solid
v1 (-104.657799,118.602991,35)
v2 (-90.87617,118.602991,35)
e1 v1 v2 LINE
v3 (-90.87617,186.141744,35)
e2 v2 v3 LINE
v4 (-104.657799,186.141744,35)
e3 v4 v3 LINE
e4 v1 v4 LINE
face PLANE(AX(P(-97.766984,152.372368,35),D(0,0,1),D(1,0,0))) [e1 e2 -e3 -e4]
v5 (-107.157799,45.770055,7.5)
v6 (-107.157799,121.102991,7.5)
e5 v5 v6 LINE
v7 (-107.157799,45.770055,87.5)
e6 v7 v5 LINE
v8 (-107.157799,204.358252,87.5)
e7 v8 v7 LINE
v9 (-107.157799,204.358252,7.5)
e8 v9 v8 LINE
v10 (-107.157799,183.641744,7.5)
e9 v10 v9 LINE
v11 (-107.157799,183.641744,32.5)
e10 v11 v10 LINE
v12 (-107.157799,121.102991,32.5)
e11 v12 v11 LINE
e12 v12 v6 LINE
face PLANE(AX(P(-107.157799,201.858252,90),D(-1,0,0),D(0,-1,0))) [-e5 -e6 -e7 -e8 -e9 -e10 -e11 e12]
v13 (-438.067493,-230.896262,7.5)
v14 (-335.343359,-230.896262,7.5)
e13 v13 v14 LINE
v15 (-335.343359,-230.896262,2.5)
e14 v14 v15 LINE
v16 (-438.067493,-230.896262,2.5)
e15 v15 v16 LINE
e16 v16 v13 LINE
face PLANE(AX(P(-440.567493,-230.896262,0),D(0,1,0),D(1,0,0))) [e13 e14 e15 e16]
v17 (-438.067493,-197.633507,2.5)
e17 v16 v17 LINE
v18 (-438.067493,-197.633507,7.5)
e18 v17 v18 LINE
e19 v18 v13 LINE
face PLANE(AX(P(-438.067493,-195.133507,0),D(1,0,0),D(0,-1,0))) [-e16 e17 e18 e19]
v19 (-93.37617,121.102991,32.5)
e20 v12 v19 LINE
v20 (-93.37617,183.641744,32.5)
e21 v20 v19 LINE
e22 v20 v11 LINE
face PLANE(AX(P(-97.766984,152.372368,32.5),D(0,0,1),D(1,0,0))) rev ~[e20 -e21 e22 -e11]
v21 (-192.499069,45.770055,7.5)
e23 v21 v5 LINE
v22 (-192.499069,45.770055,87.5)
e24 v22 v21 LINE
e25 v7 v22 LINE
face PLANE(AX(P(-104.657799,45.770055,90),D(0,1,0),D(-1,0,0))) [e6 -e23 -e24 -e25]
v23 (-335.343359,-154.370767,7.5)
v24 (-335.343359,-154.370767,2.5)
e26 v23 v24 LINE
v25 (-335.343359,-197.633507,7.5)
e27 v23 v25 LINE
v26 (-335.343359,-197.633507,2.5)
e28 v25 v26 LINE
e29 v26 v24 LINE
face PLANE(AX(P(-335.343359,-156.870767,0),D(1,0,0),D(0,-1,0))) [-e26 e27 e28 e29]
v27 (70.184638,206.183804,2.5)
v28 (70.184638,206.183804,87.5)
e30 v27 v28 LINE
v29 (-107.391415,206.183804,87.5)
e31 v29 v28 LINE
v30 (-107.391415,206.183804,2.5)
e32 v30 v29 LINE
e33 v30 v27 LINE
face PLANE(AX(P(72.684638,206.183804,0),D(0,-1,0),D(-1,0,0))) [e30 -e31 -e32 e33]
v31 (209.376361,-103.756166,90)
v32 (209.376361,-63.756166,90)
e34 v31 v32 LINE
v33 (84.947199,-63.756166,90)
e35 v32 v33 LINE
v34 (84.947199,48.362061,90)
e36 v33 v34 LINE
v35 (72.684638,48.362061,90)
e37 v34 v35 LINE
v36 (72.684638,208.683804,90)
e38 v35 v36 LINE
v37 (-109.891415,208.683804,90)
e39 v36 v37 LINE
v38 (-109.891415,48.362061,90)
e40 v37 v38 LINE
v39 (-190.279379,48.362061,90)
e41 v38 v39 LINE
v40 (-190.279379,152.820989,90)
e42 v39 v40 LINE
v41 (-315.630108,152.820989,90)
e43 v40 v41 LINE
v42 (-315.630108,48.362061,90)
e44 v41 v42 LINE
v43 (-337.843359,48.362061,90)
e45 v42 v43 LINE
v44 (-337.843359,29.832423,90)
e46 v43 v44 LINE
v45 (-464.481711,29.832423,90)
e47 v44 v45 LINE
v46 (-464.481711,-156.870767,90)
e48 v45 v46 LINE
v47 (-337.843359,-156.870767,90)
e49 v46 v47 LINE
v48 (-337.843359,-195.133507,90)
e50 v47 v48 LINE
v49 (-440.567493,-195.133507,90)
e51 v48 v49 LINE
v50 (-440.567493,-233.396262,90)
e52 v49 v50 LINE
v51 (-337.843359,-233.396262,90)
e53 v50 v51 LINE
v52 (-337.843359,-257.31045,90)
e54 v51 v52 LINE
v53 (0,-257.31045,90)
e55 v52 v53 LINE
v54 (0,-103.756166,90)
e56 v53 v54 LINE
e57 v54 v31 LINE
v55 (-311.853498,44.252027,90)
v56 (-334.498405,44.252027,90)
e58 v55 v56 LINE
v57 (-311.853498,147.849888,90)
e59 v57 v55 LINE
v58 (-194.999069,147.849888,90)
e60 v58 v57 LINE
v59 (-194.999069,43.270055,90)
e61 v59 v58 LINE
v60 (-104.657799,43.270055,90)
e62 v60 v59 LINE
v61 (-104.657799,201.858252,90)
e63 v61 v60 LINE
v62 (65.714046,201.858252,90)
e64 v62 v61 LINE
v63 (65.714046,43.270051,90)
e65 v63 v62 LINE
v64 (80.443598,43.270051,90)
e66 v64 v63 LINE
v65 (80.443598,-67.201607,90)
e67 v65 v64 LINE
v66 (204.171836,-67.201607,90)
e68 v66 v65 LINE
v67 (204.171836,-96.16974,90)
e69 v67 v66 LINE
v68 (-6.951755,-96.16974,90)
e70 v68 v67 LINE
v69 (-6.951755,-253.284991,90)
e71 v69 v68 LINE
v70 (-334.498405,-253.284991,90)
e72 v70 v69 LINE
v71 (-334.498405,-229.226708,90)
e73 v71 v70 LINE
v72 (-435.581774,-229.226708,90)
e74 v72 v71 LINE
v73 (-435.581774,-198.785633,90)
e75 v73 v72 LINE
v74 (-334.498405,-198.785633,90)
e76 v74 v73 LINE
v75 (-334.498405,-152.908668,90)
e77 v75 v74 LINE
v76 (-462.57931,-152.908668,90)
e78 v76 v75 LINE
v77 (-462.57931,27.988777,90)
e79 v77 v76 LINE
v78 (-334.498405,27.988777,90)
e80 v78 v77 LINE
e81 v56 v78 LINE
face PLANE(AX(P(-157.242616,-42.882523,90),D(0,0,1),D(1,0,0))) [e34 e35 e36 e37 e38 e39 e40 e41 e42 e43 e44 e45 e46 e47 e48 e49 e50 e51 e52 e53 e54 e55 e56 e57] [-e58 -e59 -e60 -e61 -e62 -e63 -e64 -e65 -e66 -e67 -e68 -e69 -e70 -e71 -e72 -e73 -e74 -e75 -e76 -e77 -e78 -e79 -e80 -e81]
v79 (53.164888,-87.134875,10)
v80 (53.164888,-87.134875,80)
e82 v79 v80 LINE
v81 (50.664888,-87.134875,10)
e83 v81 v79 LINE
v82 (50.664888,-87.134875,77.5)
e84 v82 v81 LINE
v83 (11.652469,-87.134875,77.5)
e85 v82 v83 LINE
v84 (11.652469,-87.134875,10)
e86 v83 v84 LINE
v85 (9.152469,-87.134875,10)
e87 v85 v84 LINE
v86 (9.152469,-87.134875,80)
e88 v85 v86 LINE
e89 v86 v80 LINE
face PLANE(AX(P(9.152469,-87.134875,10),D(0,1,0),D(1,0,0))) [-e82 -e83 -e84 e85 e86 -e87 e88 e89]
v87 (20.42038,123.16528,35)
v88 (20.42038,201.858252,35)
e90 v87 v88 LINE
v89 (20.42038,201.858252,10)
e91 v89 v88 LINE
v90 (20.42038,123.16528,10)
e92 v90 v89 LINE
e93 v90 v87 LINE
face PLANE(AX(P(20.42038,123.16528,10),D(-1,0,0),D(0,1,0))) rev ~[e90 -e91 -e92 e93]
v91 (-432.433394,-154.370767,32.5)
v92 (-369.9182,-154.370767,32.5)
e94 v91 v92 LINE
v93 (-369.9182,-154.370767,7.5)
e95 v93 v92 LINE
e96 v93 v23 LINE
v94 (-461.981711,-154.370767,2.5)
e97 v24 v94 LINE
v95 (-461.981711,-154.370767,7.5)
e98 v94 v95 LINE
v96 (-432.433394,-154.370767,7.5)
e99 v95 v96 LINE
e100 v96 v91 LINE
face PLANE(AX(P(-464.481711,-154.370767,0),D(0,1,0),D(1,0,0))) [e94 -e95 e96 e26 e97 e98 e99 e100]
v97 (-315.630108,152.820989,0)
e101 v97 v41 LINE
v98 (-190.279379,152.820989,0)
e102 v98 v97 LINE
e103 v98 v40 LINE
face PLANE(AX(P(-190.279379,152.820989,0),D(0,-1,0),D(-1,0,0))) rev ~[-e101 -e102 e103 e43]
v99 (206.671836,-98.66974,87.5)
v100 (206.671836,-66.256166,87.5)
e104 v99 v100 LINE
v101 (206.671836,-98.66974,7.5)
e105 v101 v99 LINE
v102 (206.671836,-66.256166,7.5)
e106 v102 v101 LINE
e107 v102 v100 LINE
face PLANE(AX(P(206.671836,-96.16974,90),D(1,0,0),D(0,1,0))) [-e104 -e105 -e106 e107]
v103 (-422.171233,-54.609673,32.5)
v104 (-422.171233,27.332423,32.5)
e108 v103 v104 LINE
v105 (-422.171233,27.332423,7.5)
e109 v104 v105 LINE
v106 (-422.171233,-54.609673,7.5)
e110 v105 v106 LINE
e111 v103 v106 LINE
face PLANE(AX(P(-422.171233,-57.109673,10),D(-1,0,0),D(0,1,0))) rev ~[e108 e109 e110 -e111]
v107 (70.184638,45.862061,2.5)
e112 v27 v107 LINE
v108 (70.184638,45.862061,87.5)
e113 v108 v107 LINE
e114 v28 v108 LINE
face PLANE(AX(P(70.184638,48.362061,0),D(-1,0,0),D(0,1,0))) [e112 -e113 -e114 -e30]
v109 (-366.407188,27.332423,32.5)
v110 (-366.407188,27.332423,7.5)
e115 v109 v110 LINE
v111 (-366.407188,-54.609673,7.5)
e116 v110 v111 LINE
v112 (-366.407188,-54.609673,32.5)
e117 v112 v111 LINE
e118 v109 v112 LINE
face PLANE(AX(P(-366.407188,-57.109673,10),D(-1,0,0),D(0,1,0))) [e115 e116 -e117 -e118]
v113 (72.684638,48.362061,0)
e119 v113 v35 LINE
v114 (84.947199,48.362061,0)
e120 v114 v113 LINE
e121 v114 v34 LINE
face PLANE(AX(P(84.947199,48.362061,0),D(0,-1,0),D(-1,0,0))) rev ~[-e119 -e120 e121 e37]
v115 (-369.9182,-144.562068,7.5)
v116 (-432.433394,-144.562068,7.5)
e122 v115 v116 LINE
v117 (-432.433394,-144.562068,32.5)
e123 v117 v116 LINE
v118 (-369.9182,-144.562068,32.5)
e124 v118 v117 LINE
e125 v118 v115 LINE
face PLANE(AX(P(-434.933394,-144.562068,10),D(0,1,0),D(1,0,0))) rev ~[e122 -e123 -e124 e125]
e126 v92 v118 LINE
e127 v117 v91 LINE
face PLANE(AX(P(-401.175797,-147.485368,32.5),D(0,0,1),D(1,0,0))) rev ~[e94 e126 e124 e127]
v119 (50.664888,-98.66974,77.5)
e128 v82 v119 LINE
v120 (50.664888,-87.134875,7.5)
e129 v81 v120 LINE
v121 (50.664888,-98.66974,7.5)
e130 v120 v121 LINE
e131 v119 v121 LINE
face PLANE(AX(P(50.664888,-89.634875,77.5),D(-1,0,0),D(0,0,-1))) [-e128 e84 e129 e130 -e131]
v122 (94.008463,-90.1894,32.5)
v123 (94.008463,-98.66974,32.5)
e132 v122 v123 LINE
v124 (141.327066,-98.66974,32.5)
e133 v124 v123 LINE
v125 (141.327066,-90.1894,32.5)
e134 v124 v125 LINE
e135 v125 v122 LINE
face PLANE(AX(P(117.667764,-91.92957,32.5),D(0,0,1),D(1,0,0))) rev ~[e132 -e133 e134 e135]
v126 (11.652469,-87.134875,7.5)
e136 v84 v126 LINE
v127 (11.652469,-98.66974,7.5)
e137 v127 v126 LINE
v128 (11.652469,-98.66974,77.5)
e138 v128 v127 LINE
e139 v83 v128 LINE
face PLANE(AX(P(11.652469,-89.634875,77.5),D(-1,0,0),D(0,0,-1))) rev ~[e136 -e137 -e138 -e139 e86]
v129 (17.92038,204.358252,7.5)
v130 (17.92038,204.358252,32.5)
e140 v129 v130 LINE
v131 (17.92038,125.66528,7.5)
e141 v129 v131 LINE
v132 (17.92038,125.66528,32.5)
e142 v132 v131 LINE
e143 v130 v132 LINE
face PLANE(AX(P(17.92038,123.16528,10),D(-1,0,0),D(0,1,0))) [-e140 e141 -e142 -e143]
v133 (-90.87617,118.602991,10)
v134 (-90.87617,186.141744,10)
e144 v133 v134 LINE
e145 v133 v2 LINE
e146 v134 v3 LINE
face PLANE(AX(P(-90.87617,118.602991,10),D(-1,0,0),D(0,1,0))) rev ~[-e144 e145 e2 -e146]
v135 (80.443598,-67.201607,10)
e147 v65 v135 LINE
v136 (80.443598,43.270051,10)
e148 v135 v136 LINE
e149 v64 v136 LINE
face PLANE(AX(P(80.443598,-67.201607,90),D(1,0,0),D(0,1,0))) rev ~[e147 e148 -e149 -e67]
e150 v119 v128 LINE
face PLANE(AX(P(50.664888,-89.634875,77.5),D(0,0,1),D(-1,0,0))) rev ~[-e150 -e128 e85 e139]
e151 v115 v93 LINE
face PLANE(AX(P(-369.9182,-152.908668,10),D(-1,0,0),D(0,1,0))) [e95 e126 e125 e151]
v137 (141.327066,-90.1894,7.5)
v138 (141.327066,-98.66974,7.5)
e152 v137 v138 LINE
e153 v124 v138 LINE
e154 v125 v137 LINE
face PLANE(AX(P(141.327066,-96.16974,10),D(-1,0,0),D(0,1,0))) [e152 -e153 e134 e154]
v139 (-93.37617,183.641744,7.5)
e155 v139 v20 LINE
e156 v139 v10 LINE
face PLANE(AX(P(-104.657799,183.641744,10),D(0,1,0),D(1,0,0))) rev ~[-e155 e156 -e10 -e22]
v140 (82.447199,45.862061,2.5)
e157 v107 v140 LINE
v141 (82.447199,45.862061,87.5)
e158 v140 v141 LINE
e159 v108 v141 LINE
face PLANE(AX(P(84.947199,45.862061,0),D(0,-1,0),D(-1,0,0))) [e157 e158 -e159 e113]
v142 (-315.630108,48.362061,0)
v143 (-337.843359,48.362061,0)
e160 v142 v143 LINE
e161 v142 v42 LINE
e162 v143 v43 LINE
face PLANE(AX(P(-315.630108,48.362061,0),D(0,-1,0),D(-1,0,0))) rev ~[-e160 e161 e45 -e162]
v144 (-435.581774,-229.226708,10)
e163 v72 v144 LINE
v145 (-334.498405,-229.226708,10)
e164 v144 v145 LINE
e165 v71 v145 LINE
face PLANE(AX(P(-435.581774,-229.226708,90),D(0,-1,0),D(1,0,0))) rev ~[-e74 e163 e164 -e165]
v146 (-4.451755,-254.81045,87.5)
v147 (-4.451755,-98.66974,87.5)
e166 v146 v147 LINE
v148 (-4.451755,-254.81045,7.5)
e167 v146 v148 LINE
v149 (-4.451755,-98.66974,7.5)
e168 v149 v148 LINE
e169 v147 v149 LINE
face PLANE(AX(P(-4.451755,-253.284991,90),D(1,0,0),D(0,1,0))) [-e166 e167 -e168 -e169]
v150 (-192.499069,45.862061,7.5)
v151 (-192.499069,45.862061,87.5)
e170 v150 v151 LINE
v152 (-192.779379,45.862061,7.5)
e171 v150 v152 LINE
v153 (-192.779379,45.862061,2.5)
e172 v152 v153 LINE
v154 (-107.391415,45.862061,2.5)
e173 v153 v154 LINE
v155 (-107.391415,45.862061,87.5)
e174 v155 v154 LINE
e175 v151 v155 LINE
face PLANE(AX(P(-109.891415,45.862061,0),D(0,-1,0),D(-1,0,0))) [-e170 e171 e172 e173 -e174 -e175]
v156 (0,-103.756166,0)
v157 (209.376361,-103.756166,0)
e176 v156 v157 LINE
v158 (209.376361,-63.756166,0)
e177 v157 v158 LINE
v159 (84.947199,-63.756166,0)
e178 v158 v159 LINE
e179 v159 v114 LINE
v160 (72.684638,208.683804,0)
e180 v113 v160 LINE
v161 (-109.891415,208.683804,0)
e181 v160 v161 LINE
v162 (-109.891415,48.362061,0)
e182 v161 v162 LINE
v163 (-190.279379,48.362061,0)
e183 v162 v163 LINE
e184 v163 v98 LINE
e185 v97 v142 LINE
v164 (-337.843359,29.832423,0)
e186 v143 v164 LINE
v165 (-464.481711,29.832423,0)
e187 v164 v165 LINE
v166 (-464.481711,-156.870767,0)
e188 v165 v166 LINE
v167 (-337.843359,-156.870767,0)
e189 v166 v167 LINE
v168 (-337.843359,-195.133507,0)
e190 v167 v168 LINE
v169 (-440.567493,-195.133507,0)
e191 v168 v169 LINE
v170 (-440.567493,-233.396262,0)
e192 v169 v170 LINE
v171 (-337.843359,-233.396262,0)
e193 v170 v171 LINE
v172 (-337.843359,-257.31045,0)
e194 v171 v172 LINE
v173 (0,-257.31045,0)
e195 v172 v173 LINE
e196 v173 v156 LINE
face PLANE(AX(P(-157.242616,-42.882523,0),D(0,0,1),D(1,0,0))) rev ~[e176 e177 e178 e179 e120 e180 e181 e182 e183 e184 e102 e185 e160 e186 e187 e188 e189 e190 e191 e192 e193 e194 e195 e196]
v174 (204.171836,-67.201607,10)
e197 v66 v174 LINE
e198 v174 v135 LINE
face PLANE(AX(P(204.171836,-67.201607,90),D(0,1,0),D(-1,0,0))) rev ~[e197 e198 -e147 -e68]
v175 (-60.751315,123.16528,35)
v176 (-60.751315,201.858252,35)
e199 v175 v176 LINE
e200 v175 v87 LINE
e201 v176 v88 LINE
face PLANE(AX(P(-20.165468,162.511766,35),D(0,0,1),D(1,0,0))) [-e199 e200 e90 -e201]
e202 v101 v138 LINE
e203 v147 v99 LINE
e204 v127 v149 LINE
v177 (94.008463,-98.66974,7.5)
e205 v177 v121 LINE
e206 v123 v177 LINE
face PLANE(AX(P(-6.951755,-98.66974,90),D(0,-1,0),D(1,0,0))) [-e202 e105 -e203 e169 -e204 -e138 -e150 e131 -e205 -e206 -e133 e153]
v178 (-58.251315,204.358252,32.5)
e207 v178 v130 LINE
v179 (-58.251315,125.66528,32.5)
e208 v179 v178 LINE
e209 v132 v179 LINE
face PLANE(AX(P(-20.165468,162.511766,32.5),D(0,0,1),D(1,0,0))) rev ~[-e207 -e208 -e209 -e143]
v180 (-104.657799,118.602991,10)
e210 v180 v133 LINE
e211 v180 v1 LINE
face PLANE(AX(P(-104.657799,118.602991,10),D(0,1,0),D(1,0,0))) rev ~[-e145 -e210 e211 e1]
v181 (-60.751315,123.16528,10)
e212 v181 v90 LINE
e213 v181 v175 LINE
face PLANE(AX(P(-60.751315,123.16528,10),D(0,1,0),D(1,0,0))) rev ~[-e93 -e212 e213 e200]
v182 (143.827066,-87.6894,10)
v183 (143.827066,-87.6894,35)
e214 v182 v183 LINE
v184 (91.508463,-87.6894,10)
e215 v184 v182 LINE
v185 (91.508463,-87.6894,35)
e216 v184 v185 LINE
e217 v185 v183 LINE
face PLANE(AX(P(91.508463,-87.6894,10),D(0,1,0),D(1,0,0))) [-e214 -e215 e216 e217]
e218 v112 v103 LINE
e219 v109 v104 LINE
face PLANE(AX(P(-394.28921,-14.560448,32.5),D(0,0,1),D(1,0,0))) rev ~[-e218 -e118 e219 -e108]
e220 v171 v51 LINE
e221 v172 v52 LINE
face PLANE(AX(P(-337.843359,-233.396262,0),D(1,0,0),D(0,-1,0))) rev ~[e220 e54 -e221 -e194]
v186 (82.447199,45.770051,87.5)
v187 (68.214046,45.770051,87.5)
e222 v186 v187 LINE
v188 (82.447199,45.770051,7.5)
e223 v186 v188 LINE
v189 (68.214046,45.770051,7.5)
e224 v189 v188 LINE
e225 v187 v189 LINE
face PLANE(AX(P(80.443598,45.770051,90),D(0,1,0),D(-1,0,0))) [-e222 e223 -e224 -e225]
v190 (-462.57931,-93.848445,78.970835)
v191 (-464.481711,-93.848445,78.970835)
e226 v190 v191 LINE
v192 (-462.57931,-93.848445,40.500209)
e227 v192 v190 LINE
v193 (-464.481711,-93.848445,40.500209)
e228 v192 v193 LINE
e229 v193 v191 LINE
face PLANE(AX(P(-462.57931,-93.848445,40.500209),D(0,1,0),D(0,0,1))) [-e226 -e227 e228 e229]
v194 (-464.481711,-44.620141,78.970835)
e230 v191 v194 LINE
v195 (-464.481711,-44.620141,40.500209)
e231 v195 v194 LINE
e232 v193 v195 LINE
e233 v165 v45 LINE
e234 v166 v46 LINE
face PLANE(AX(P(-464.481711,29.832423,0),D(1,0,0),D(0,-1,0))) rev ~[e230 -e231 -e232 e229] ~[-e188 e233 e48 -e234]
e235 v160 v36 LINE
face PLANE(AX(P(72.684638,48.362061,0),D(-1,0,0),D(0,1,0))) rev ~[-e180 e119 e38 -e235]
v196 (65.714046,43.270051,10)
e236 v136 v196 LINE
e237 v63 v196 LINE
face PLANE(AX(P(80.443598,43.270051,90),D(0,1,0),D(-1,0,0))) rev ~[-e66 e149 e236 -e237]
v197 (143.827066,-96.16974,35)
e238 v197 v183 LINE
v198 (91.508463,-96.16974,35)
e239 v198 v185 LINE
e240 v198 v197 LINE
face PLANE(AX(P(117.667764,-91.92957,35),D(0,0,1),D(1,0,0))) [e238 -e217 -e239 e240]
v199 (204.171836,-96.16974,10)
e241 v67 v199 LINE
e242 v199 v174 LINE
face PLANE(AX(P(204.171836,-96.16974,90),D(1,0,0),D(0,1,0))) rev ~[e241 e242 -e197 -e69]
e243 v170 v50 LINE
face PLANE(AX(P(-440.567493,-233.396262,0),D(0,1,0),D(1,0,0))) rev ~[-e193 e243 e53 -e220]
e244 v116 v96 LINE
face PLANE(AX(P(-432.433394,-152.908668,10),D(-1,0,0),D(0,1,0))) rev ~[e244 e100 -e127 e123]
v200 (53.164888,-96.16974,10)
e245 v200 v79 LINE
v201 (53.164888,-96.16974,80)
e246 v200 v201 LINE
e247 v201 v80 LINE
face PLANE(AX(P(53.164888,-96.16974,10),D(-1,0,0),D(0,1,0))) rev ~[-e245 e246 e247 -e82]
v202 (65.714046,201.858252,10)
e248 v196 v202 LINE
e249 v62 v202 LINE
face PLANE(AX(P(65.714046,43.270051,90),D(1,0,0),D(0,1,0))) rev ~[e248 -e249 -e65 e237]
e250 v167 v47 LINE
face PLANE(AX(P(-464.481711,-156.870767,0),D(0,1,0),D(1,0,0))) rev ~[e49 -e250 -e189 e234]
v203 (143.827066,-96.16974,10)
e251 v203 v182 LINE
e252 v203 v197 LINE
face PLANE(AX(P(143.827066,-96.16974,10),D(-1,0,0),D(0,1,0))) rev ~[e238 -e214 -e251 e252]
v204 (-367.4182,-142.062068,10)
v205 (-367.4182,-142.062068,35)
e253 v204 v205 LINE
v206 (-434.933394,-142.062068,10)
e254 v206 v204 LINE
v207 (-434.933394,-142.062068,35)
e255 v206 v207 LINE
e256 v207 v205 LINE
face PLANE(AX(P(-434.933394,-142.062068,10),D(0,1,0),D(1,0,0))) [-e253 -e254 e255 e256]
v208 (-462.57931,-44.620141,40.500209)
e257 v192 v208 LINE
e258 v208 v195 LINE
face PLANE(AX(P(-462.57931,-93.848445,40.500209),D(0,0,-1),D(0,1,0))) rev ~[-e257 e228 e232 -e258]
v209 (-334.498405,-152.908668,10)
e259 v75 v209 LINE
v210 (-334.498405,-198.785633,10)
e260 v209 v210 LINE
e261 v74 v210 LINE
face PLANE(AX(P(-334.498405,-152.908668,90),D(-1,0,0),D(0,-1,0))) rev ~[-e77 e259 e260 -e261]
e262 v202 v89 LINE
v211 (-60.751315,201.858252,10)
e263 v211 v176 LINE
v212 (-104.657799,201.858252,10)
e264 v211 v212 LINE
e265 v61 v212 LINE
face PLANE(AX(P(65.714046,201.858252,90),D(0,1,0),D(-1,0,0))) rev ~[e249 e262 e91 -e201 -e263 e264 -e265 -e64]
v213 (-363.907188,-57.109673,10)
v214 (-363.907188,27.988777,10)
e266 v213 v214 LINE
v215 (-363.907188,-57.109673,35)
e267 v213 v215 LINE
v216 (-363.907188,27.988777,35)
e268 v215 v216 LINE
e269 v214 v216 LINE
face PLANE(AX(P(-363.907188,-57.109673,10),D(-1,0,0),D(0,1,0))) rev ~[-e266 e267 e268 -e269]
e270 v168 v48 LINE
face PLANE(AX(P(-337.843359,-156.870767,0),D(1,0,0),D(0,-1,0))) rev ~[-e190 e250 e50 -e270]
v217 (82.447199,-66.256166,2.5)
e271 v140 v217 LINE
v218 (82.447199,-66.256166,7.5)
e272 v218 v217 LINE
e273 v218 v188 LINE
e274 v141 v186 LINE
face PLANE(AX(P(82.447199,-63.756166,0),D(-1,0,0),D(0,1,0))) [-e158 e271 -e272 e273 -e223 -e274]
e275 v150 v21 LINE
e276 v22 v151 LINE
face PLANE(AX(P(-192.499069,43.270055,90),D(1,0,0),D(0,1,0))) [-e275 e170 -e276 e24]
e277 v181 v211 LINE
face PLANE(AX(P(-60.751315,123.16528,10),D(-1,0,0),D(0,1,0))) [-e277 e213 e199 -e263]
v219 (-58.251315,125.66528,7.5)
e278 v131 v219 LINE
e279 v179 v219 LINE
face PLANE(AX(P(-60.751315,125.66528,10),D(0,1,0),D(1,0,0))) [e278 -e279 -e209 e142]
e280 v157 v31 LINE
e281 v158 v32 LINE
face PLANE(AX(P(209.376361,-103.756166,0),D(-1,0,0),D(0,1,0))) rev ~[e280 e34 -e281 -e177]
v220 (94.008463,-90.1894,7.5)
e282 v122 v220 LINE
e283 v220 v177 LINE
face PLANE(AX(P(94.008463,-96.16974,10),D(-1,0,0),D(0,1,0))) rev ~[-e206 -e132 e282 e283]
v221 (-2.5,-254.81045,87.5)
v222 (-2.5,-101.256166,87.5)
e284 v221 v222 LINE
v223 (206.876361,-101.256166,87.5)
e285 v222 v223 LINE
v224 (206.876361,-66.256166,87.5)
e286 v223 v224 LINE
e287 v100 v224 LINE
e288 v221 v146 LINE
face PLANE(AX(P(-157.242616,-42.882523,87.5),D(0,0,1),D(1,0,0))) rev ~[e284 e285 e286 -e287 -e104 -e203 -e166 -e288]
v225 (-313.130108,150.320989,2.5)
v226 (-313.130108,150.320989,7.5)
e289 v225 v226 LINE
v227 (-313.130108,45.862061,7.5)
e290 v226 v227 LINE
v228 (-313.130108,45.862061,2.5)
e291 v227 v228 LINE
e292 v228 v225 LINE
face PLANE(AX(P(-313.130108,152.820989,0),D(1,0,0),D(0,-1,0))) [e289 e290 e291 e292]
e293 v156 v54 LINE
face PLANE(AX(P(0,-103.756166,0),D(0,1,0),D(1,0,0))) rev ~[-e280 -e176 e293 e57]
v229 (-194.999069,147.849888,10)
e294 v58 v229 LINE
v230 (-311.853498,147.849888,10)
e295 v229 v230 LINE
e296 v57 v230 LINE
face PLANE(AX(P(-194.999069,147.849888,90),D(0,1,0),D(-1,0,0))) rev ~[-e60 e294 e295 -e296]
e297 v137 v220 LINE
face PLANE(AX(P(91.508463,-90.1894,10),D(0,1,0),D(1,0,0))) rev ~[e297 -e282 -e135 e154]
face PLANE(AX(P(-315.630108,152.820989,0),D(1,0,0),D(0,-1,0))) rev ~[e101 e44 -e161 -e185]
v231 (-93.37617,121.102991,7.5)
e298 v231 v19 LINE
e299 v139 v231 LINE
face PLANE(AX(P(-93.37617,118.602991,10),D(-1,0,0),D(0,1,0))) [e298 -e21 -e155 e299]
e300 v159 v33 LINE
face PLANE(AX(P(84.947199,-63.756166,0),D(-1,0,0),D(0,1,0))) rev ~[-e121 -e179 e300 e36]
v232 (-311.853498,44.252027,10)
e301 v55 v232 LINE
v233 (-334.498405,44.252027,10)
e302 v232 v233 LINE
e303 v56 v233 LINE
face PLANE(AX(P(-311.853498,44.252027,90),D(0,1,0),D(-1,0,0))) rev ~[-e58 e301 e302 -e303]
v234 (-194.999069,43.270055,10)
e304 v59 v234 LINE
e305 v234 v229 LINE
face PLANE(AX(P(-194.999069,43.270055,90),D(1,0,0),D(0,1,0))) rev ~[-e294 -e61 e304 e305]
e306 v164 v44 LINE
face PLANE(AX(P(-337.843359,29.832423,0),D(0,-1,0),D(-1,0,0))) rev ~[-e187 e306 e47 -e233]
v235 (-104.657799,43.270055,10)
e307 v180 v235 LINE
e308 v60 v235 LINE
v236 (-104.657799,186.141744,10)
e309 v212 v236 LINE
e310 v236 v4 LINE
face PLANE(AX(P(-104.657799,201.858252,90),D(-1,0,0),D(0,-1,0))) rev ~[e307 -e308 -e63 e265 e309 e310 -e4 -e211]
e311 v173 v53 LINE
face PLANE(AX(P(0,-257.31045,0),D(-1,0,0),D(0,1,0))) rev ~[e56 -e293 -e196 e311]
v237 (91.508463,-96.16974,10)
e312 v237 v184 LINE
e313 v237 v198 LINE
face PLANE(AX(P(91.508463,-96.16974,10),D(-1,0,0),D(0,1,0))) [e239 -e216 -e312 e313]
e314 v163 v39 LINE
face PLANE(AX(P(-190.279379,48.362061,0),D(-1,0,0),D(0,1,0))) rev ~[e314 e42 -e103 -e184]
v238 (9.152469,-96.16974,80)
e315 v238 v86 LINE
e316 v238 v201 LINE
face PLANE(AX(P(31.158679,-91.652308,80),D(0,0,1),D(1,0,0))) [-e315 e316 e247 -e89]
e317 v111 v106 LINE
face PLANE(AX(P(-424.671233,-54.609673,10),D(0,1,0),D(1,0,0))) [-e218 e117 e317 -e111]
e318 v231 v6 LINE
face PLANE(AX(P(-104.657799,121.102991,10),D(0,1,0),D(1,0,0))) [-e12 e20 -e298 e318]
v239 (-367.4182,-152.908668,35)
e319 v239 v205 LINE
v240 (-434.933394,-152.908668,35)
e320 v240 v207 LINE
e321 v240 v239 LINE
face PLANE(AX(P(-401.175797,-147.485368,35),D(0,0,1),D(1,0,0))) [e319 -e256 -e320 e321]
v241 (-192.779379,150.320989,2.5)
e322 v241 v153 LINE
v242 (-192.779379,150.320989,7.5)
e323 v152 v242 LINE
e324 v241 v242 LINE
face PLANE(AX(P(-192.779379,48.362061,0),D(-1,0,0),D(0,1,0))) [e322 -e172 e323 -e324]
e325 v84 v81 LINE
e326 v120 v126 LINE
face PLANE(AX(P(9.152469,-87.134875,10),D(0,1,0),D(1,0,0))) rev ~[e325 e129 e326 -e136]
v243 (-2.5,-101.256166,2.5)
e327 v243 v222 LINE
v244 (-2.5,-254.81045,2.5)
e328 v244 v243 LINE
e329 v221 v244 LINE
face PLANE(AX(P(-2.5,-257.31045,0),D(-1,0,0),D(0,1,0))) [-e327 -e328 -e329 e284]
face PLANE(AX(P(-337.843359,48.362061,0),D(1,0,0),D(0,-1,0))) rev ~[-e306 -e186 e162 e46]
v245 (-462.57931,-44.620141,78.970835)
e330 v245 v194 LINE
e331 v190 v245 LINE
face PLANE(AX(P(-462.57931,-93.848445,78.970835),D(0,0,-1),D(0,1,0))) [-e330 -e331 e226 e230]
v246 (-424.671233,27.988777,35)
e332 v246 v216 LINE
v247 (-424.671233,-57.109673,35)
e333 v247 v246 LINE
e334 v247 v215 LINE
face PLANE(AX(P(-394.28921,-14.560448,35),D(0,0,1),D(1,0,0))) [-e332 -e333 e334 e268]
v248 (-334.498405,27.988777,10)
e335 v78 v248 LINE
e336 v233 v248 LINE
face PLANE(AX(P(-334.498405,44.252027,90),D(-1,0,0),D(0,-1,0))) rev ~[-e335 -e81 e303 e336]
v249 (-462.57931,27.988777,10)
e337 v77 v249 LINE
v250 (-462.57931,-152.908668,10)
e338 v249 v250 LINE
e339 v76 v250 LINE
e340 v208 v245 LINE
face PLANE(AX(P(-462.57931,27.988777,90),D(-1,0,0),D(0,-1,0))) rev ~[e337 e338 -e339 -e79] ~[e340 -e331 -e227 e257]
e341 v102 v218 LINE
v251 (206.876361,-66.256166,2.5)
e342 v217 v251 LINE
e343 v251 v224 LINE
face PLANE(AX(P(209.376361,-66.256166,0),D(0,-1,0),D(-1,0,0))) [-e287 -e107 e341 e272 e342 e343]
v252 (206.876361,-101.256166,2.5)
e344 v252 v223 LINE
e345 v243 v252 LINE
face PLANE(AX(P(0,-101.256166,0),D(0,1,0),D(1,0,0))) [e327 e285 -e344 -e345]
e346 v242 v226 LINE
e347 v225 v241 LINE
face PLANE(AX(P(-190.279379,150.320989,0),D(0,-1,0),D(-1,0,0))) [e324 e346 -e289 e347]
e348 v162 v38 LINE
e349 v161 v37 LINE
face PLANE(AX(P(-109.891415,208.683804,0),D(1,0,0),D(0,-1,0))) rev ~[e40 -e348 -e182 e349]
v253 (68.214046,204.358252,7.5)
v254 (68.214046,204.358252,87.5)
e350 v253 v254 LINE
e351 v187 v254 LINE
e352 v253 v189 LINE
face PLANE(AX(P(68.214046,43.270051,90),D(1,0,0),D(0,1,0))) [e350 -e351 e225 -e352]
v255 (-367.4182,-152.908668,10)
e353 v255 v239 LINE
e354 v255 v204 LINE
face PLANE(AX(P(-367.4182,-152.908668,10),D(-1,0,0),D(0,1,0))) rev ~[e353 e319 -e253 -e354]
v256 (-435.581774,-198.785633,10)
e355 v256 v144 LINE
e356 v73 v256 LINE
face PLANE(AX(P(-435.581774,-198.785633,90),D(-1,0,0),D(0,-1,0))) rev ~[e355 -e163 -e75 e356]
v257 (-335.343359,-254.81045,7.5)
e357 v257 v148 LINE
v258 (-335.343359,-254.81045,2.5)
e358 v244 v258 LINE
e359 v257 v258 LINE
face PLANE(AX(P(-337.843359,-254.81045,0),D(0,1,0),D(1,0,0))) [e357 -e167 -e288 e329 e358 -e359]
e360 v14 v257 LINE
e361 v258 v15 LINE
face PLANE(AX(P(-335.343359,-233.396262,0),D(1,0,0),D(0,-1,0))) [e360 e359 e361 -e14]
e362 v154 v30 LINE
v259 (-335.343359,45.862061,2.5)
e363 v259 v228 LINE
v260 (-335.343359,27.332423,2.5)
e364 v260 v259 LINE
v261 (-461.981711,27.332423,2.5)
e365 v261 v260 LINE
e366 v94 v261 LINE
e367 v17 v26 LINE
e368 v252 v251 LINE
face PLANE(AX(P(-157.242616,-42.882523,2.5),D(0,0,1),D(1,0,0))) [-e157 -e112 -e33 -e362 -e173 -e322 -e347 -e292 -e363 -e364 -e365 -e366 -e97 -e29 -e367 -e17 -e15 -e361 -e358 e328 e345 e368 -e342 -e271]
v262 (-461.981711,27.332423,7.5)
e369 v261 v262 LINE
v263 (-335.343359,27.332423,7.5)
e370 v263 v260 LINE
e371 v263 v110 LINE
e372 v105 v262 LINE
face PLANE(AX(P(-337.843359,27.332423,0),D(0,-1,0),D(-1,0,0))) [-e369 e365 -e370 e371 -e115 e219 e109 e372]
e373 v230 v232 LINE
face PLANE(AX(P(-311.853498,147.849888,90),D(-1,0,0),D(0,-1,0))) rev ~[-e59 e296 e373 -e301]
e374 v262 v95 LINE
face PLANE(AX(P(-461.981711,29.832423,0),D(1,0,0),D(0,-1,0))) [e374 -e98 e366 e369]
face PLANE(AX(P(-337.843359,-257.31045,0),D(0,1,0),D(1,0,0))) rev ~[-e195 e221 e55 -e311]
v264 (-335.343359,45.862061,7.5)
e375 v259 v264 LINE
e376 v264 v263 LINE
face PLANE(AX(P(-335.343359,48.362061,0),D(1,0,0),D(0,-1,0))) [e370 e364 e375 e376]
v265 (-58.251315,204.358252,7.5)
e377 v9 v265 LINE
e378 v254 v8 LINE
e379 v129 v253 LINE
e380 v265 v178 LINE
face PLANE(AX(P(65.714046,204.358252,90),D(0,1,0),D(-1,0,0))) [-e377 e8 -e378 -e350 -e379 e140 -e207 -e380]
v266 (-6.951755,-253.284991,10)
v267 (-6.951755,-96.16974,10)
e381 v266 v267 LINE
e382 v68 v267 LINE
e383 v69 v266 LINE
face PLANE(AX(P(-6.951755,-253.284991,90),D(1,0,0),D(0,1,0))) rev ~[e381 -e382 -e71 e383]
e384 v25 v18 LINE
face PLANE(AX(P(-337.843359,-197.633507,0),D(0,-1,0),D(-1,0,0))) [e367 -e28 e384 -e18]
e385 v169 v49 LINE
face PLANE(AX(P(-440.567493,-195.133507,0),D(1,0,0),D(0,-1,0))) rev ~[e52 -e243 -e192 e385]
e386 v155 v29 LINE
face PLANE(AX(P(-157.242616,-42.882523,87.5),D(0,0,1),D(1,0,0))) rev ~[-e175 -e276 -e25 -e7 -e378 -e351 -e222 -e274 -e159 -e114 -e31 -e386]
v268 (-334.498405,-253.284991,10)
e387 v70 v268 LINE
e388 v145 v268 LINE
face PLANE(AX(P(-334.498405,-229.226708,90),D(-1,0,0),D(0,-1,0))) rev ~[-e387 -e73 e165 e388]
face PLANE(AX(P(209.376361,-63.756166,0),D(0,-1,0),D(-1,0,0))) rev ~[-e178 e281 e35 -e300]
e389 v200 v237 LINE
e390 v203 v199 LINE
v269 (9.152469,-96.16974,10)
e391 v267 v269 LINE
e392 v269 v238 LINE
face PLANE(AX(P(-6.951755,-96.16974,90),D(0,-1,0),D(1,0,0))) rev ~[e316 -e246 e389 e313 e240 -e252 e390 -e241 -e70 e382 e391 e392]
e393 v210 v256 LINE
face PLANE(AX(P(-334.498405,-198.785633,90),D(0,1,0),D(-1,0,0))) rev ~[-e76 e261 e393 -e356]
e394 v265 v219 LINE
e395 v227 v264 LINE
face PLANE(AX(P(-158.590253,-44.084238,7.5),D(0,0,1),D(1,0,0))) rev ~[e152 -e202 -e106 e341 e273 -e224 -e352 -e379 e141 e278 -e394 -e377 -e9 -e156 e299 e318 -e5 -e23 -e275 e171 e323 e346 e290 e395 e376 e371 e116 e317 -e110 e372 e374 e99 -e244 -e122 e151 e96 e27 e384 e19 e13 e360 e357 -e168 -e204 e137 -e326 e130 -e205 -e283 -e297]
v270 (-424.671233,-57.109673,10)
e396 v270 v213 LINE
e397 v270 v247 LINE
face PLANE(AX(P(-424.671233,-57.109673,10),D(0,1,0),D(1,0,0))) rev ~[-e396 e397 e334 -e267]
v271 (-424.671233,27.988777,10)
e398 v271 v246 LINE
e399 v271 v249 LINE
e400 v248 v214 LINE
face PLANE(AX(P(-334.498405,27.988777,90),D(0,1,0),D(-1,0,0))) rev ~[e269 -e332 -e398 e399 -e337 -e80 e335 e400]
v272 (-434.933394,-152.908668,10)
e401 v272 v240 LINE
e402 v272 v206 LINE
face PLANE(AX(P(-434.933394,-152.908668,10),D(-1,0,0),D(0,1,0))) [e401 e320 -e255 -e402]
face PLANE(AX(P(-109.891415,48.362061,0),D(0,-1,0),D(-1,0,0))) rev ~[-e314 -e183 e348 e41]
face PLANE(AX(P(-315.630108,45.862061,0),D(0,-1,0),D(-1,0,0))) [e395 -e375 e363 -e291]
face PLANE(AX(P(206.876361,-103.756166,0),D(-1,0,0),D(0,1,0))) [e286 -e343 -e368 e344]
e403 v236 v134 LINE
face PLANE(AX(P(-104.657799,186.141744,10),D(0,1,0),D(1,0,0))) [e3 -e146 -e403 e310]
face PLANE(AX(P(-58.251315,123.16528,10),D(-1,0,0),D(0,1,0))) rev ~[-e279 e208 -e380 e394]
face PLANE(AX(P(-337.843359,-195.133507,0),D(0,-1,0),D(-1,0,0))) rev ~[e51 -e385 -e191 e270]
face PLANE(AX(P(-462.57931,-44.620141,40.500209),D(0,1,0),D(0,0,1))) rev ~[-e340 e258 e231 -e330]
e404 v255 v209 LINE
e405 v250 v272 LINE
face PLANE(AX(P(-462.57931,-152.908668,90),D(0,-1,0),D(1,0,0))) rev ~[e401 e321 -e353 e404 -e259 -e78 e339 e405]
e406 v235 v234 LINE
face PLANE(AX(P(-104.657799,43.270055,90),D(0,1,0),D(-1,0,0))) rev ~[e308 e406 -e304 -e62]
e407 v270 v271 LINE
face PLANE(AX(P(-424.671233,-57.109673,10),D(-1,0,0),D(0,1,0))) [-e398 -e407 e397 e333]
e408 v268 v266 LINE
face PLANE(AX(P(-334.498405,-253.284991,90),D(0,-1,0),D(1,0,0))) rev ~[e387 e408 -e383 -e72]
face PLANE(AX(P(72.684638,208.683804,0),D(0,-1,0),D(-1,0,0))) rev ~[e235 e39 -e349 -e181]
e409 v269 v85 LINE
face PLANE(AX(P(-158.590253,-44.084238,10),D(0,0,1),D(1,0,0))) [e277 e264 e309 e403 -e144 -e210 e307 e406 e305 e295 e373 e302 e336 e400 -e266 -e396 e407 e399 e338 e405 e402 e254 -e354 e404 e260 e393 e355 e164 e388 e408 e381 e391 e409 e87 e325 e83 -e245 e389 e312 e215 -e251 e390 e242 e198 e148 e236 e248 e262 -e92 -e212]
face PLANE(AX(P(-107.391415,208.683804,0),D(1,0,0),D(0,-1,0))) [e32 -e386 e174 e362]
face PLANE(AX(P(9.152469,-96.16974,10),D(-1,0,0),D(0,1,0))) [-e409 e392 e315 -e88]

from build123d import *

# Parameters (mm, degrees)
F1_DEPTH  = 90
F3_DEPTH  = 80
F14_W     = 60.7640445232
F14_H     = 85.0984491408
F14_W_2   = 67.515194416
F14_H_2   = 10.8465999365
F15_DEPTH = 25
F16_W     = 49.2283031344
F16_H     = 38.4706258774
F17_DEPTH = 25
F18_W     = 81.171695143
F18_H     = 78.6929726601
F18_W_2   = 13.7816295028
F18_H_2   = 67.5387531519
F19_DEPTH = 25
F20_W     = 44.0124189481
F20_H     = 9.0348646045
F21_DEPTH = 70
F22_W     = 52.3186028004
F22_H     = 8.4803402424
F23_DEPTH = 25
F24_T     = -2.5


# Not quite as in the source:
# - a shell that OpenCascade refuses in one call is made with other operations: the cavity is built on its own and cut out
# - the program builds the solid bodies; features that only make, move or delete a surface that nothing else refers to are left out


with BuildPart() as f1:
    # F0 (on Top) → F1 (new body)
    with BuildSketch(Plane.XY):
        Polygon((0, -103.756165579), (61.2453594729, -103.756165579), (209.3763612108, -103.756165579), (209.3763612108, -63.756165579), (84.9471986294, -63.756165579), (84.9471986294, 48.3620613813), (72.6846382022, 48.3620613813), (72.6846382022, 208.6838036776), (-109.8914146423, 208.6838036776), (-109.8914146423, 48.3620613813), (-190.279379487, 48.3620613813), (-190.279379487, 152.8209894896), (-315.6301081181, 152.8209894896), (-315.6301081181, 48.3620613813), (-337.8433585167, 48.3620613813), (-337.8433585167, 29.8324227333), (-464.4817113876, 29.8324227333), (-464.4817113876, -156.8707674742), (-337.8433585167, -156.8707674742), (-337.8433585167, -195.1335072517), (-440.5674934387, -195.1335072517), (-440.5674934387, -233.3962619305), (-337.8433585167, -233.3962619305), (-337.8433585167, -257.3104500771), (0, -257.3104500771), align=None)
    extrude(amount=F1_DEPTH)

    # F2 (on face) → F3 (cut)
    with BuildSketch(Plane.XY.offset(90)):
        Polygon((-334.4984054565, 27.9887765646), (-462.5793099403, 27.9887765646), (-462.5793099403, -152.908667922), (-334.4984054565, -152.908667922), (-334.4984054565, -198.7856328487), (-435.5817735195, -198.7856328487), (-435.5817735195, -229.2267084122), (-334.4984054565, -229.2267084122), (-334.4984054565, -253.2849907875), (-6.9517553784, -253.2849907875), (-6.9517553784, -96.1697399616), (204.1718363762, -96.1697399616), (204.1718363762, -67.2016069293), (80.44359833, -67.2016069293), (80.44359833, 43.2700514793), (65.7140463591, 43.2700514793), (65.7140463591, 201.8582522869), (-104.6577990055, 201.8582522869), (-104.6577990055, 43.2700552046), (-194.9990689754, 43.2700552046), (-194.9990689754, 147.8498876095), (-311.8534982204, 147.8498876095), (-311.8534982204, 44.2520268261), (-334.4984054565, 44.2520268261), align=None)
    extrude(amount=-F3_DEPTH, mode=Mode.SUBTRACT)

    # F14 (on face) → F15 (join)
    with BuildSketch(Plane.XY.offset(10)):
        with Locations((-394.2892104387, -14.5604480058)):
            Rectangle(F14_W, F14_H)
        with Locations((-401.1757969856, -147.4853679538)):
            Rectangle(F14_W_2, F14_H_2)
    extrude(amount=F15_DEPTH)

    # F16 (on face) → F17 (cut)
    with BuildSketch(Plane.YZ.offset(-462.5793099403)):
        with Locations((-69.2342929542, 59.7355216742)):
            Rectangle(F16_W, F16_H)
    extrude(amount=-F17_DEPTH, mode=Mode.SUBTRACT)

    # F18 (on face) → F19 (join)
    with BuildSketch(Plane.XY.offset(10)):
        with Locations((-20.1654676348, 162.5117659569)):
            Rectangle(F18_W, F18_H)
        with Locations((-97.7669842541, 152.3723676801)):
            Rectangle(F18_W_2, F18_H_2)
    extrude(amount=F19_DEPTH)

    # F20 (on face) → F21 (join)
    with BuildSketch(Plane.XY.offset(10)):
        with Locations((31.1586786993, -91.6523076594)):
            Rectangle(F20_W, F20_H)
    extrude(amount=F21_DEPTH)

    # F22 (on face) → F23 (join)
    with BuildSketch(Plane.XY.offset(10)):
        with Locations((117.6677644253, -91.9295698404)):
            Rectangle(F22_W, F22_H)
    extrude(amount=F23_DEPTH)

    # F24: a shell. OpenCascade refuses it in one call, so the cavity is built on its own and cut out:
    # the body offset inwards by the wall thickness, plus a prism from it out through each open face.
    f24_core = offset(f1.part, amount=F24_T, kind=Kind.INTERSECTION, mode=Mode.PRIVATE)
    f24_exits = [f24_core.faces().sort_by_distance(p)[0] for p in [
        (31.158679, -89.634875, 42.5),
    ]]
    add(f24_core, mode=Mode.SUBTRACT)
    extrude(f24_exits, amount=-F24_T, mode=Mode.SUBTRACT)


solid = f1.part
